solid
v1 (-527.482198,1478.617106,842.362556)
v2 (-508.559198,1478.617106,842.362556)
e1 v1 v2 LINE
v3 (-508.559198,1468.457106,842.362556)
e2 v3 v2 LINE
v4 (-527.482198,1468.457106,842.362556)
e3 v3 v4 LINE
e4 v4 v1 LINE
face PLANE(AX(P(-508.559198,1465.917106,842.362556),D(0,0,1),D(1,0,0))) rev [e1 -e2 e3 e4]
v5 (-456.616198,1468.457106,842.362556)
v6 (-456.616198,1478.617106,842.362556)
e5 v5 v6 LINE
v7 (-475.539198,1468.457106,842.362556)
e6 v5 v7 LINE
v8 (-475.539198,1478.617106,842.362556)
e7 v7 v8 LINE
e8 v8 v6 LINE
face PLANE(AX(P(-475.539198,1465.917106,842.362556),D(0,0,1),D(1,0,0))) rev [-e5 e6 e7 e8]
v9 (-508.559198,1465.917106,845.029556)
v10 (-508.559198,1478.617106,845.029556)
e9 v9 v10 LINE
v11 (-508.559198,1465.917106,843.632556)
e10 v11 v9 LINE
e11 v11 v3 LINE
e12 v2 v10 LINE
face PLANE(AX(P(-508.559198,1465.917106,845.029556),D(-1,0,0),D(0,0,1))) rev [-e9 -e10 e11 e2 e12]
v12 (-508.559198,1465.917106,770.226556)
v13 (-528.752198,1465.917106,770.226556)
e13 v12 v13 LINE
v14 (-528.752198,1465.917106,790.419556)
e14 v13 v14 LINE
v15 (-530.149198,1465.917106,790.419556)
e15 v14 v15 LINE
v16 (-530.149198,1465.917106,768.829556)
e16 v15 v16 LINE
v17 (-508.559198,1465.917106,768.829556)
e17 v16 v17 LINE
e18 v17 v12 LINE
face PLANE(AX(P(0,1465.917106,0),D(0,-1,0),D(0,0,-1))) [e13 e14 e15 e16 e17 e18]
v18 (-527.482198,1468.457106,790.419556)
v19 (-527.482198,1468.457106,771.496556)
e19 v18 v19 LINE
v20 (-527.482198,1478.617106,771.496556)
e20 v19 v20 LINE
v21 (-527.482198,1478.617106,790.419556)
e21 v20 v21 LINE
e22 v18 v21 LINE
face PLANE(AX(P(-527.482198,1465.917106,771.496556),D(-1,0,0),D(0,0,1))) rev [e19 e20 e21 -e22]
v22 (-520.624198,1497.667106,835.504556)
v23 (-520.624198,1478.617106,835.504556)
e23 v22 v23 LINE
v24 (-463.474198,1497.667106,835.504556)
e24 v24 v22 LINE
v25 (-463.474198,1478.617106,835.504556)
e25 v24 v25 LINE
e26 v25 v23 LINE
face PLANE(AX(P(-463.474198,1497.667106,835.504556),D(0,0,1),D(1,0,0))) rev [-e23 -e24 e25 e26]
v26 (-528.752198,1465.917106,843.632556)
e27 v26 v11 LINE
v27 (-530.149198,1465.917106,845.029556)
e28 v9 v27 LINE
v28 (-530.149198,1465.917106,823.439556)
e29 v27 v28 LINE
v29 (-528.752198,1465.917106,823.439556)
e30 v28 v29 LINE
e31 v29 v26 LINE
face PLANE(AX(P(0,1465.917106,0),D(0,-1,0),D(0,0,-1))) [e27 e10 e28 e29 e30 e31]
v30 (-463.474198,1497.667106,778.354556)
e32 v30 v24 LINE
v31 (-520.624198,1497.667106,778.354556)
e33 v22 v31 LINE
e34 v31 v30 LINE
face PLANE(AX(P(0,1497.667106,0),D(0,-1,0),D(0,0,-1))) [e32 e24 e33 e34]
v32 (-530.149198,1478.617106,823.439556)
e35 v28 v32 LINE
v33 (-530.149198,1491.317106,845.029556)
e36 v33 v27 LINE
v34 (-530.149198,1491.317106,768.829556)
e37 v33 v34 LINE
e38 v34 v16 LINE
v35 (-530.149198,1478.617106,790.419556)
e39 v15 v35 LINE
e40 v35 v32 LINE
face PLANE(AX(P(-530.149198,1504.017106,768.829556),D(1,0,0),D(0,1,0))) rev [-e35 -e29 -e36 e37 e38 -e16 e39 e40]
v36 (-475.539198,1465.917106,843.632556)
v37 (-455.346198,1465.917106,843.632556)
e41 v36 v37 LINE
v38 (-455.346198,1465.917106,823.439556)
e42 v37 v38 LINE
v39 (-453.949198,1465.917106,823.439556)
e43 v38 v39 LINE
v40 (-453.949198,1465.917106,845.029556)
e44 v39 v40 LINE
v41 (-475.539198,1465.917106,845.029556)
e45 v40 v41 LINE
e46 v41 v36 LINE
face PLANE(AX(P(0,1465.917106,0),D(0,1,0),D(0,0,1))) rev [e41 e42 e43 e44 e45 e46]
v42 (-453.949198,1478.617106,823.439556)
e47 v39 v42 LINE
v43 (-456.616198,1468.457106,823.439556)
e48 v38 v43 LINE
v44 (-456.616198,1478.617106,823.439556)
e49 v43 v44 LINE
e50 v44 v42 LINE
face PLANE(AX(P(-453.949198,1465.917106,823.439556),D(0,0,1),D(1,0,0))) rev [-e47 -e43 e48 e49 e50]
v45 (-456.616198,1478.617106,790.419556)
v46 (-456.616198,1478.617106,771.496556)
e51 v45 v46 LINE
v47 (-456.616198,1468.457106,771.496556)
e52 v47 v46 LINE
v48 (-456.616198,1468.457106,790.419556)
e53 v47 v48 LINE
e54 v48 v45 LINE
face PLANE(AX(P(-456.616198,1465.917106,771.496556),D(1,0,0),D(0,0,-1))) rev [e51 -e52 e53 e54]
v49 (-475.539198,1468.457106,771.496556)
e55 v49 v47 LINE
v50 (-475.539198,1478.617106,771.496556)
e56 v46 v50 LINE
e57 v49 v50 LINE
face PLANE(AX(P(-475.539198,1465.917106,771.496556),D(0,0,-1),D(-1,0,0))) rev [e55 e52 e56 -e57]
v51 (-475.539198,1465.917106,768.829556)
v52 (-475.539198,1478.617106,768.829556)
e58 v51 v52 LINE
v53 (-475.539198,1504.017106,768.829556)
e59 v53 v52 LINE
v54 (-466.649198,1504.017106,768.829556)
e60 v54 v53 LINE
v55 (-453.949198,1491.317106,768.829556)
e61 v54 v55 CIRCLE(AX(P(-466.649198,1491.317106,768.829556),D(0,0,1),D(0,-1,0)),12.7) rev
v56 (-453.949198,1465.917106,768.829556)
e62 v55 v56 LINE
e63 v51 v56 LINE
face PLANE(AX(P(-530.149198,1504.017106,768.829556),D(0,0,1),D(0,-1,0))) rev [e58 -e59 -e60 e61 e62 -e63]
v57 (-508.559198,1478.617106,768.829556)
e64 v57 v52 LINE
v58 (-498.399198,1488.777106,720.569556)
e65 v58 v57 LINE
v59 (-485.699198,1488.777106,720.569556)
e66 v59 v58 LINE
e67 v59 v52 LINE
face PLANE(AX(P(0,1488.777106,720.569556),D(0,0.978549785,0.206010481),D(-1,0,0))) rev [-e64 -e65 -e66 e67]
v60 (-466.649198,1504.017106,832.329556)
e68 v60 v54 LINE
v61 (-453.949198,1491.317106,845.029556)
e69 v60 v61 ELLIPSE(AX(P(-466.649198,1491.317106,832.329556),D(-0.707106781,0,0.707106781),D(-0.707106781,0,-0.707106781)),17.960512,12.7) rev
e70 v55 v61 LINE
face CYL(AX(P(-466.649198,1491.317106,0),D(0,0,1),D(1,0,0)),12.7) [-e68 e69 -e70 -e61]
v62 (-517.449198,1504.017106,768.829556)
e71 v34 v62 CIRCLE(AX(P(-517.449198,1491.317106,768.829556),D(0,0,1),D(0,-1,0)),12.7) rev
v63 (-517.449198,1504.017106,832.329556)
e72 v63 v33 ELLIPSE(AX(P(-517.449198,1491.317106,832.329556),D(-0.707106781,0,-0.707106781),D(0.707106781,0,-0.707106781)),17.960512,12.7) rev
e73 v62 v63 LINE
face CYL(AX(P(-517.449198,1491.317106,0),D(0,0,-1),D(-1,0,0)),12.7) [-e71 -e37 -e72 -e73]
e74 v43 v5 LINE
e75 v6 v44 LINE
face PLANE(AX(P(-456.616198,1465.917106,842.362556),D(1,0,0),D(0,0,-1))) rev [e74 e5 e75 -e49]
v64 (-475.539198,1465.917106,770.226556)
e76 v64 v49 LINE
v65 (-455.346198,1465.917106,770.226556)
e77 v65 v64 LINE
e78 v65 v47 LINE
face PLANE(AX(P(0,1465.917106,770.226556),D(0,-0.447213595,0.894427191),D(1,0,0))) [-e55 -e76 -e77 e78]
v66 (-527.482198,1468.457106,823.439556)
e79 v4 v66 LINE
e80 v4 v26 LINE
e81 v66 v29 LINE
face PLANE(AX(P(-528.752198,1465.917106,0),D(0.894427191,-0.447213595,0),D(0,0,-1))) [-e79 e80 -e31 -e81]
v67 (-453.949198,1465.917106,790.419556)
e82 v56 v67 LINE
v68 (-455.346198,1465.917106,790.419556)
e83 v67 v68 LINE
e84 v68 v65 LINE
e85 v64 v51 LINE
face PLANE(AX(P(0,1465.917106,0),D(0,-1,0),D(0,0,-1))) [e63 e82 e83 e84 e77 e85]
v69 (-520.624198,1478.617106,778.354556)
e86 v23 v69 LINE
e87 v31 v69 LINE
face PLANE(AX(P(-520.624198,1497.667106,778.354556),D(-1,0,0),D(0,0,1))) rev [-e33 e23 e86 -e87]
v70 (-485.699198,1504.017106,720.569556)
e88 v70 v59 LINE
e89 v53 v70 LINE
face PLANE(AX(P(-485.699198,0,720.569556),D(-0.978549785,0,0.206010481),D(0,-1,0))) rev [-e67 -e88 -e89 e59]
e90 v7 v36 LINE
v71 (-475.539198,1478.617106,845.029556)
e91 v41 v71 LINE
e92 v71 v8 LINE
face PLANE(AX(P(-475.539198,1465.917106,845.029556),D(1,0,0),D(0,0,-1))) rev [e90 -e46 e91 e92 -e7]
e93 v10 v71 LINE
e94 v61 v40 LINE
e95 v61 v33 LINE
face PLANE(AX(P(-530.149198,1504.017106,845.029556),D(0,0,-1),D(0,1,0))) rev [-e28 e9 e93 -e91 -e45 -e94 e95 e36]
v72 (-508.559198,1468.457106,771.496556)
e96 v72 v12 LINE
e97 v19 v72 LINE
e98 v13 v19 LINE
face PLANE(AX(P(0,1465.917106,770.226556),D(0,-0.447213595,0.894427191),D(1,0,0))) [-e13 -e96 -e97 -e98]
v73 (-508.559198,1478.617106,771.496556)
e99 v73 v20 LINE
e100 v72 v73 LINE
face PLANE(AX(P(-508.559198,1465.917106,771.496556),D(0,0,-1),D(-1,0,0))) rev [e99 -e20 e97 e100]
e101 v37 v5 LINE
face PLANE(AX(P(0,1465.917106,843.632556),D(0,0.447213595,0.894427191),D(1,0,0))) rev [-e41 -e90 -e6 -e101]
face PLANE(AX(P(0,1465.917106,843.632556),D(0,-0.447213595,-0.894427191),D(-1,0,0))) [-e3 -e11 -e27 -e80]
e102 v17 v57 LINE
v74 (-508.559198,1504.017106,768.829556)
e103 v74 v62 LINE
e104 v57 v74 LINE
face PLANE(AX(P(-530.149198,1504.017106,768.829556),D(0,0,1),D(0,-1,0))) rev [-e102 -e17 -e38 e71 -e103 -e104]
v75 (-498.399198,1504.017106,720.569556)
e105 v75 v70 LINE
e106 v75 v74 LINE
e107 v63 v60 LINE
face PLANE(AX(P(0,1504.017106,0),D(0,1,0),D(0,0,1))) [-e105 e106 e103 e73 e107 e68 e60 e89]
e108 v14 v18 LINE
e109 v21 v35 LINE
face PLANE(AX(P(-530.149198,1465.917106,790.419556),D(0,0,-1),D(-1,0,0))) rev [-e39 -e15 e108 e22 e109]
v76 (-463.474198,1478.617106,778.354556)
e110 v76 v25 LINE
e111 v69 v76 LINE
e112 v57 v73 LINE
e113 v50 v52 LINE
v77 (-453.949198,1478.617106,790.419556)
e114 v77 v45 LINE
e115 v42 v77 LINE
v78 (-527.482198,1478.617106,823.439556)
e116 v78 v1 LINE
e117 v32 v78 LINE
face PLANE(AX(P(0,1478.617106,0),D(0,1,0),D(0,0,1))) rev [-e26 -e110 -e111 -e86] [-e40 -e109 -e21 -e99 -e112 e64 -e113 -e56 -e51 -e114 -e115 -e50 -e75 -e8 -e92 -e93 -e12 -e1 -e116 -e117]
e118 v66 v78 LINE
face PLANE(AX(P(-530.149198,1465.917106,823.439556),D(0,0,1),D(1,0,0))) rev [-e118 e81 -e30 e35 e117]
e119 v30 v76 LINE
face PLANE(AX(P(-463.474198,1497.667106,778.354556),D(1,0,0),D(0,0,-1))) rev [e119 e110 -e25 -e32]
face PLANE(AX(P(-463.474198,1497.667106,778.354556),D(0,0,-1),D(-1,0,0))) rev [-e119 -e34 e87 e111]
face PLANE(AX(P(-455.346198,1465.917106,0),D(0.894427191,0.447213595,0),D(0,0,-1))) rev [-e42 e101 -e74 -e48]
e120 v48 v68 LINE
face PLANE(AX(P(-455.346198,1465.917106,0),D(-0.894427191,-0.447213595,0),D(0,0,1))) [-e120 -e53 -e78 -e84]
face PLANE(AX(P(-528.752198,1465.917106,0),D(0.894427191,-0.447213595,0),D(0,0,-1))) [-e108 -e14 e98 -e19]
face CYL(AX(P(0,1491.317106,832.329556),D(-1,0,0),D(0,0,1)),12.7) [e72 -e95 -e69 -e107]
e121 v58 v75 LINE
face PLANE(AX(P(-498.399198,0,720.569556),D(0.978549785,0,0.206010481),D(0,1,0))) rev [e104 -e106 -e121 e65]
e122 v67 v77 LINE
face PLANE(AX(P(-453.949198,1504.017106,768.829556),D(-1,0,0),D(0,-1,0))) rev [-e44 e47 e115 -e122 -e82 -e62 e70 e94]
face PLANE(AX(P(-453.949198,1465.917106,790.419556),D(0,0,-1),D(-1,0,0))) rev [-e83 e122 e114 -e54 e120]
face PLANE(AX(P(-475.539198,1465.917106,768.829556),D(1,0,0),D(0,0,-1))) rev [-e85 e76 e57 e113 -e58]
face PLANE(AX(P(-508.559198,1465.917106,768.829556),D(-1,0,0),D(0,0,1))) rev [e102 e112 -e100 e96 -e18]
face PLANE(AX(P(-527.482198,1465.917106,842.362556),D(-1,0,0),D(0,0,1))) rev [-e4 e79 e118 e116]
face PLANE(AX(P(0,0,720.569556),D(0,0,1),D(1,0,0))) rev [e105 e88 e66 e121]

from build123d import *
from OCP.BRepFilletAPI import BRepFilletAPI_MakeChamfer

# Parameters (mm, degrees)
SKETCH1_W           = 76.2
SKETCH1_H           = 76.2
BOSS_EXTRUDE1_DEPTH = 25.4
SKETCH2_W           = 57.15
SKETCH2_H           = 57.15
CUT_EXTRUDE1_DEPTH  = 19.05
BOSS_EXTRUDE2_DEPTH = 12.7
CHAMFER1_SIZE       = 2.54
CHAMFER1_SIZE2      = 1.27
FILLET1_R           = 12.7
SKETCH4_W           = 33.02
SKETCH4_H           = 25.4
BOSS_EXTRUDE3_DEPTH = 48.26
CHAMFER2_SIZE       = 48.26
CHAMFER2_SIZE_2     = 10.16


with BuildPart() as part:
    # Sketch1 → Boss-Extrude1 (new body)
    with BuildSketch(Plane(origin=(0, 1478.617106037, 0), x_dir=(1, 0, 0), z_dir=(0, 1, 0))):
        with Locations((-492.049198231, -806.92955637)):
            Rectangle(SKETCH1_W, SKETCH1_H)
    extrude(amount=BOSS_EXTRUDE1_DEPTH)

    # Sketch2 → Cut-Extrude1 (cut)
    with BuildSketch(Plane(origin=(0, 1478.617106037, 0), x_dir=(-1, 0, 0), z_dir=(0, -1, 0))):
        with Locations((492.049198231, -806.92955637)):
            Rectangle(SKETCH2_W, SKETCH2_H)
    extrude(amount=-CUT_EXTRUDE1_DEPTH, mode=Mode.SUBTRACT)

    # Sketch3 → Boss-Extrude2 (add)
    with BuildSketch(Plane(origin=(0, 1478.617106037, 0), x_dir=(-1, 0, 0), z_dir=(0, -1, 0))):
        Polygon((530.149198231, -790.41955637), (527.482198231, -790.41955637), (527.482198231, -771.49655637), (508.559198231, -771.49655637), (508.559198231, -768.82955637), (530.149198231, -768.82955637), align=None)
        Polygon((530.149198231, -823.43955637), (527.482198231, -823.43955637), (527.482198231, -842.36255637), (508.559198231, -842.36255637), (508.559198231, -845.02955637), (530.149198231, -845.02955637), align=None)
        Polygon((475.539198231, -768.82955637), (475.539198231, -771.49655637), (456.616198231, -771.49655637), (456.616198231, -790.41955637), (453.949198231, -790.41955637), (453.949198231, -768.82955637), align=None)
        Polygon((475.539198231, -845.02955637), (475.539198231, -842.36255637), (456.616198231, -842.36255637), (456.616198231, -823.43955637), (453.949198231, -823.43955637), (453.949198231, -845.02955637), align=None)
    extrude(amount=BOSS_EXTRUDE2_DEPTH)

    # Chamfer1: one chamfer whose edges measure the first distance from different faces: ONE call of the kernel's chamfer builder (chamfer() names one face for all edges)
    chamfer1_edges_1 = [part.edges().sort_by_distance(p)[0] for p in [
        (-518.020698231, 1465.917106037, 771.49655637),
    ]]
    chamfer1_side_1 = [part.faces().sort_by_distance(p)[0] for p in [
        (-518.020698231, 1472.267106037, 771.49655637),
    ]]
    chamfer1_edges_2 = [part.edges().sort_by_distance(p)[0] for p in [
        (-527.482198231, 1465.917106037, 780.95805637),
    ]]
    chamfer1_side_2 = [part.faces().sort_by_distance(p)[0] for p in [
        (-527.482198231, 1472.267106037, 780.95805637),
    ]]
    chamfer1_edges_3 = [part.edges().sort_by_distance(p)[0] for p in [
        (-527.482198231, 1465.917106037, 832.90105637),
    ]]
    chamfer1_side_3 = [part.faces().sort_by_distance(p)[0] for p in [
        (-527.482198231, 1472.267106037, 832.90105637),
    ]]
    chamfer1_edges_4 = [part.edges().sort_by_distance(p)[0] for p in [
        (-518.020698231, 1465.917106037, 842.36255637),
    ]]
    chamfer1_side_4 = [part.faces().sort_by_distance(p)[0] for p in [
        (-518.020698231, 1472.267106037, 842.36255637),
    ]]
    chamfer1_edges_5 = [part.edges().sort_by_distance(p)[0] for p in [
        (-466.077698231, 1465.917106037, 771.49655637),
    ]]
    chamfer1_side_5 = [part.faces().sort_by_distance(p)[0] for p in [
        (-466.077698231, 1472.267106037, 771.49655637),
    ]]
    chamfer1_edges_6 = [part.edges().sort_by_distance(p)[0] for p in [
        (-456.616198231, 1465.917106037, 780.95805637),
    ]]
    chamfer1_side_6 = [part.faces().sort_by_distance(p)[0] for p in [
        (-456.616198231, 1472.267106037, 780.95805637),
    ]]
    chamfer1_edges_7 = [part.edges().sort_by_distance(p)[0] for p in [
        (-466.077698231, 1465.917106037, 842.36255637),
    ]]
    chamfer1_side_7 = [part.faces().sort_by_distance(p)[0] for p in [
        (-466.077698231, 1472.267106037, 842.36255637),
    ]]
    chamfer1_edges_8 = [part.edges().sort_by_distance(p)[0] for p in [
        (-456.616198231, 1465.917106037, 832.90105637),
    ]]
    chamfer1_side_8 = [part.faces().sort_by_distance(p)[0] for p in [
        (-456.616198231, 1472.267106037, 832.90105637),
    ]]
    chamfer1 = BRepFilletAPI_MakeChamfer(part.part.solid().wrapped)
    for e in chamfer1_edges_1:
        chamfer1.Add(CHAMFER1_SIZE, CHAMFER1_SIZE2, e.wrapped, chamfer1_side_1[0].wrapped)  # the first distance lies on this face
    for e in chamfer1_edges_2:
        chamfer1.Add(CHAMFER1_SIZE, CHAMFER1_SIZE2, e.wrapped, chamfer1_side_2[0].wrapped)  # the first distance lies on this face
    for e in chamfer1_edges_3:
        chamfer1.Add(CHAMFER1_SIZE, CHAMFER1_SIZE2, e.wrapped, chamfer1_side_3[0].wrapped)  # the first distance lies on this face
    for e in chamfer1_edges_4:
        chamfer1.Add(CHAMFER1_SIZE, CHAMFER1_SIZE2, e.wrapped, chamfer1_side_4[0].wrapped)  # the first distance lies on this face
    for e in chamfer1_edges_5:
        chamfer1.Add(CHAMFER1_SIZE, CHAMFER1_SIZE2, e.wrapped, chamfer1_side_5[0].wrapped)  # the first distance lies on this face
    for e in chamfer1_edges_6:
        chamfer1.Add(CHAMFER1_SIZE, CHAMFER1_SIZE2, e.wrapped, chamfer1_side_6[0].wrapped)  # the first distance lies on this face
    for e in chamfer1_edges_7:
        chamfer1.Add(CHAMFER1_SIZE, CHAMFER1_SIZE2, e.wrapped, chamfer1_side_7[0].wrapped)  # the first distance lies on this face
    for e in chamfer1_edges_8:
        chamfer1.Add(CHAMFER1_SIZE, CHAMFER1_SIZE2, e.wrapped, chamfer1_side_8[0].wrapped)  # the first distance lies on this face
    add(Compound.cast(chamfer1.Shape()), mode=Mode.REPLACE)

    # Fillet1
    fillet1_edges = [part.edges().sort_by_distance(p)[0] for p in [
        (-530.149198231, 1504.017106037, 806.92955637),
        (-492.049198231, 1504.017106037, 845.02955637),
        (-453.949198231, 1504.017106037, 806.92955637),
    ]]
    fillet(fillet1_edges, radius=FILLET1_R)

    # Sketch4 → Boss-Extrude3 (add)
    with BuildSketch(Plane(origin=(0, 0, 768.82955637), x_dir=(-1, 0, 0), z_dir=(0, 0, -1))):
        with Locations((492.049198231, 1491.317106037)):
            Rectangle(SKETCH4_W, SKETCH4_H)
    extrude(amount=BOSS_EXTRUDE3_DEPTH)

    # Chamfer2
    # the kernel refuses this chamfer: 48.26, 10.16 mm, written as the material it takes off along each edge
    with BuildSketch(Plane(origin=(-508.559198231, 1353.240682796, 720.56955637), x_dir=(-0.007929773045437122, 0, 0.9999685588554512), z_dir=(0, 1, 0))) as chamfer2_piece_1_section:
        Polygon((CHAMFER2_SIZE * 0.999968558855, CHAMFER2_SIZE * 0.00792977304544), (-CHAMFER2_SIZE_2 * 0.00792977304544, CHAMFER2_SIZE_2 * 0.999968558855), (0, 0), align=None)
    chamfer2_piece_1 = extrude(amount=276.152846481, mode=Mode.PRIVATE)
    chamfer2_piece_1 = split(chamfer2_piece_1, bisect_by=Plane(origin=(-505.671976228, 1491.317106037, 768.82955637), z_dir=(0, 0, -1)), keep=Keep.TOP, mode=Mode.PRIVATE)
    add(chamfer2_piece_1, mode=Mode.SUBTRACT)
    with BuildSketch(Plane(origin=(-350.16277499, 1478.617106037, 720.56955637), x_dir=(0, -0.007929773045437122, 0.9999685588554512), z_dir=(-1, 0, 0))) as chamfer2_piece_2:
        Polygon((CHAMFER2_SIZE * 0.999968558855, CHAMFER2_SIZE * 0.00792977304544), (-CHAMFER2_SIZE_2 * 0.00792977304544, CHAMFER2_SIZE_2 * 0.999968558855), (0, 0), align=None)
    extrude(amount=283.772846481, mode=Mode.SUBTRACT)
    with BuildSketch(Plane(origin=(-475.539198231, 1629.393529277, 720.56955637), x_dir=(0.007929773045437122, 0, 0.9999685588554512), z_dir=(0, -1, 0))) as chamfer2_piece_3_section:
        Polygon((CHAMFER2_SIZE * 0.999968558855, CHAMFER2_SIZE * 0.00792977304544), (-CHAMFER2_SIZE_2 * 0.00792977304544, CHAMFER2_SIZE_2 * 0.999968558855), (0, 0), align=None)
    chamfer2_piece_3 = extrude(amount=276.152846481, mode=Mode.PRIVATE)
    chamfer2_piece_3 = split(chamfer2_piece_3, bisect_by=Plane(origin=(-478.426420234, 1491.317106037, 768.82955637), z_dir=(0, 0, -1)), keep=Keep.TOP, mode=Mode.PRIVATE)
    add(chamfer2_piece_3, mode=Mode.SUBTRACT)


solid = part.part
